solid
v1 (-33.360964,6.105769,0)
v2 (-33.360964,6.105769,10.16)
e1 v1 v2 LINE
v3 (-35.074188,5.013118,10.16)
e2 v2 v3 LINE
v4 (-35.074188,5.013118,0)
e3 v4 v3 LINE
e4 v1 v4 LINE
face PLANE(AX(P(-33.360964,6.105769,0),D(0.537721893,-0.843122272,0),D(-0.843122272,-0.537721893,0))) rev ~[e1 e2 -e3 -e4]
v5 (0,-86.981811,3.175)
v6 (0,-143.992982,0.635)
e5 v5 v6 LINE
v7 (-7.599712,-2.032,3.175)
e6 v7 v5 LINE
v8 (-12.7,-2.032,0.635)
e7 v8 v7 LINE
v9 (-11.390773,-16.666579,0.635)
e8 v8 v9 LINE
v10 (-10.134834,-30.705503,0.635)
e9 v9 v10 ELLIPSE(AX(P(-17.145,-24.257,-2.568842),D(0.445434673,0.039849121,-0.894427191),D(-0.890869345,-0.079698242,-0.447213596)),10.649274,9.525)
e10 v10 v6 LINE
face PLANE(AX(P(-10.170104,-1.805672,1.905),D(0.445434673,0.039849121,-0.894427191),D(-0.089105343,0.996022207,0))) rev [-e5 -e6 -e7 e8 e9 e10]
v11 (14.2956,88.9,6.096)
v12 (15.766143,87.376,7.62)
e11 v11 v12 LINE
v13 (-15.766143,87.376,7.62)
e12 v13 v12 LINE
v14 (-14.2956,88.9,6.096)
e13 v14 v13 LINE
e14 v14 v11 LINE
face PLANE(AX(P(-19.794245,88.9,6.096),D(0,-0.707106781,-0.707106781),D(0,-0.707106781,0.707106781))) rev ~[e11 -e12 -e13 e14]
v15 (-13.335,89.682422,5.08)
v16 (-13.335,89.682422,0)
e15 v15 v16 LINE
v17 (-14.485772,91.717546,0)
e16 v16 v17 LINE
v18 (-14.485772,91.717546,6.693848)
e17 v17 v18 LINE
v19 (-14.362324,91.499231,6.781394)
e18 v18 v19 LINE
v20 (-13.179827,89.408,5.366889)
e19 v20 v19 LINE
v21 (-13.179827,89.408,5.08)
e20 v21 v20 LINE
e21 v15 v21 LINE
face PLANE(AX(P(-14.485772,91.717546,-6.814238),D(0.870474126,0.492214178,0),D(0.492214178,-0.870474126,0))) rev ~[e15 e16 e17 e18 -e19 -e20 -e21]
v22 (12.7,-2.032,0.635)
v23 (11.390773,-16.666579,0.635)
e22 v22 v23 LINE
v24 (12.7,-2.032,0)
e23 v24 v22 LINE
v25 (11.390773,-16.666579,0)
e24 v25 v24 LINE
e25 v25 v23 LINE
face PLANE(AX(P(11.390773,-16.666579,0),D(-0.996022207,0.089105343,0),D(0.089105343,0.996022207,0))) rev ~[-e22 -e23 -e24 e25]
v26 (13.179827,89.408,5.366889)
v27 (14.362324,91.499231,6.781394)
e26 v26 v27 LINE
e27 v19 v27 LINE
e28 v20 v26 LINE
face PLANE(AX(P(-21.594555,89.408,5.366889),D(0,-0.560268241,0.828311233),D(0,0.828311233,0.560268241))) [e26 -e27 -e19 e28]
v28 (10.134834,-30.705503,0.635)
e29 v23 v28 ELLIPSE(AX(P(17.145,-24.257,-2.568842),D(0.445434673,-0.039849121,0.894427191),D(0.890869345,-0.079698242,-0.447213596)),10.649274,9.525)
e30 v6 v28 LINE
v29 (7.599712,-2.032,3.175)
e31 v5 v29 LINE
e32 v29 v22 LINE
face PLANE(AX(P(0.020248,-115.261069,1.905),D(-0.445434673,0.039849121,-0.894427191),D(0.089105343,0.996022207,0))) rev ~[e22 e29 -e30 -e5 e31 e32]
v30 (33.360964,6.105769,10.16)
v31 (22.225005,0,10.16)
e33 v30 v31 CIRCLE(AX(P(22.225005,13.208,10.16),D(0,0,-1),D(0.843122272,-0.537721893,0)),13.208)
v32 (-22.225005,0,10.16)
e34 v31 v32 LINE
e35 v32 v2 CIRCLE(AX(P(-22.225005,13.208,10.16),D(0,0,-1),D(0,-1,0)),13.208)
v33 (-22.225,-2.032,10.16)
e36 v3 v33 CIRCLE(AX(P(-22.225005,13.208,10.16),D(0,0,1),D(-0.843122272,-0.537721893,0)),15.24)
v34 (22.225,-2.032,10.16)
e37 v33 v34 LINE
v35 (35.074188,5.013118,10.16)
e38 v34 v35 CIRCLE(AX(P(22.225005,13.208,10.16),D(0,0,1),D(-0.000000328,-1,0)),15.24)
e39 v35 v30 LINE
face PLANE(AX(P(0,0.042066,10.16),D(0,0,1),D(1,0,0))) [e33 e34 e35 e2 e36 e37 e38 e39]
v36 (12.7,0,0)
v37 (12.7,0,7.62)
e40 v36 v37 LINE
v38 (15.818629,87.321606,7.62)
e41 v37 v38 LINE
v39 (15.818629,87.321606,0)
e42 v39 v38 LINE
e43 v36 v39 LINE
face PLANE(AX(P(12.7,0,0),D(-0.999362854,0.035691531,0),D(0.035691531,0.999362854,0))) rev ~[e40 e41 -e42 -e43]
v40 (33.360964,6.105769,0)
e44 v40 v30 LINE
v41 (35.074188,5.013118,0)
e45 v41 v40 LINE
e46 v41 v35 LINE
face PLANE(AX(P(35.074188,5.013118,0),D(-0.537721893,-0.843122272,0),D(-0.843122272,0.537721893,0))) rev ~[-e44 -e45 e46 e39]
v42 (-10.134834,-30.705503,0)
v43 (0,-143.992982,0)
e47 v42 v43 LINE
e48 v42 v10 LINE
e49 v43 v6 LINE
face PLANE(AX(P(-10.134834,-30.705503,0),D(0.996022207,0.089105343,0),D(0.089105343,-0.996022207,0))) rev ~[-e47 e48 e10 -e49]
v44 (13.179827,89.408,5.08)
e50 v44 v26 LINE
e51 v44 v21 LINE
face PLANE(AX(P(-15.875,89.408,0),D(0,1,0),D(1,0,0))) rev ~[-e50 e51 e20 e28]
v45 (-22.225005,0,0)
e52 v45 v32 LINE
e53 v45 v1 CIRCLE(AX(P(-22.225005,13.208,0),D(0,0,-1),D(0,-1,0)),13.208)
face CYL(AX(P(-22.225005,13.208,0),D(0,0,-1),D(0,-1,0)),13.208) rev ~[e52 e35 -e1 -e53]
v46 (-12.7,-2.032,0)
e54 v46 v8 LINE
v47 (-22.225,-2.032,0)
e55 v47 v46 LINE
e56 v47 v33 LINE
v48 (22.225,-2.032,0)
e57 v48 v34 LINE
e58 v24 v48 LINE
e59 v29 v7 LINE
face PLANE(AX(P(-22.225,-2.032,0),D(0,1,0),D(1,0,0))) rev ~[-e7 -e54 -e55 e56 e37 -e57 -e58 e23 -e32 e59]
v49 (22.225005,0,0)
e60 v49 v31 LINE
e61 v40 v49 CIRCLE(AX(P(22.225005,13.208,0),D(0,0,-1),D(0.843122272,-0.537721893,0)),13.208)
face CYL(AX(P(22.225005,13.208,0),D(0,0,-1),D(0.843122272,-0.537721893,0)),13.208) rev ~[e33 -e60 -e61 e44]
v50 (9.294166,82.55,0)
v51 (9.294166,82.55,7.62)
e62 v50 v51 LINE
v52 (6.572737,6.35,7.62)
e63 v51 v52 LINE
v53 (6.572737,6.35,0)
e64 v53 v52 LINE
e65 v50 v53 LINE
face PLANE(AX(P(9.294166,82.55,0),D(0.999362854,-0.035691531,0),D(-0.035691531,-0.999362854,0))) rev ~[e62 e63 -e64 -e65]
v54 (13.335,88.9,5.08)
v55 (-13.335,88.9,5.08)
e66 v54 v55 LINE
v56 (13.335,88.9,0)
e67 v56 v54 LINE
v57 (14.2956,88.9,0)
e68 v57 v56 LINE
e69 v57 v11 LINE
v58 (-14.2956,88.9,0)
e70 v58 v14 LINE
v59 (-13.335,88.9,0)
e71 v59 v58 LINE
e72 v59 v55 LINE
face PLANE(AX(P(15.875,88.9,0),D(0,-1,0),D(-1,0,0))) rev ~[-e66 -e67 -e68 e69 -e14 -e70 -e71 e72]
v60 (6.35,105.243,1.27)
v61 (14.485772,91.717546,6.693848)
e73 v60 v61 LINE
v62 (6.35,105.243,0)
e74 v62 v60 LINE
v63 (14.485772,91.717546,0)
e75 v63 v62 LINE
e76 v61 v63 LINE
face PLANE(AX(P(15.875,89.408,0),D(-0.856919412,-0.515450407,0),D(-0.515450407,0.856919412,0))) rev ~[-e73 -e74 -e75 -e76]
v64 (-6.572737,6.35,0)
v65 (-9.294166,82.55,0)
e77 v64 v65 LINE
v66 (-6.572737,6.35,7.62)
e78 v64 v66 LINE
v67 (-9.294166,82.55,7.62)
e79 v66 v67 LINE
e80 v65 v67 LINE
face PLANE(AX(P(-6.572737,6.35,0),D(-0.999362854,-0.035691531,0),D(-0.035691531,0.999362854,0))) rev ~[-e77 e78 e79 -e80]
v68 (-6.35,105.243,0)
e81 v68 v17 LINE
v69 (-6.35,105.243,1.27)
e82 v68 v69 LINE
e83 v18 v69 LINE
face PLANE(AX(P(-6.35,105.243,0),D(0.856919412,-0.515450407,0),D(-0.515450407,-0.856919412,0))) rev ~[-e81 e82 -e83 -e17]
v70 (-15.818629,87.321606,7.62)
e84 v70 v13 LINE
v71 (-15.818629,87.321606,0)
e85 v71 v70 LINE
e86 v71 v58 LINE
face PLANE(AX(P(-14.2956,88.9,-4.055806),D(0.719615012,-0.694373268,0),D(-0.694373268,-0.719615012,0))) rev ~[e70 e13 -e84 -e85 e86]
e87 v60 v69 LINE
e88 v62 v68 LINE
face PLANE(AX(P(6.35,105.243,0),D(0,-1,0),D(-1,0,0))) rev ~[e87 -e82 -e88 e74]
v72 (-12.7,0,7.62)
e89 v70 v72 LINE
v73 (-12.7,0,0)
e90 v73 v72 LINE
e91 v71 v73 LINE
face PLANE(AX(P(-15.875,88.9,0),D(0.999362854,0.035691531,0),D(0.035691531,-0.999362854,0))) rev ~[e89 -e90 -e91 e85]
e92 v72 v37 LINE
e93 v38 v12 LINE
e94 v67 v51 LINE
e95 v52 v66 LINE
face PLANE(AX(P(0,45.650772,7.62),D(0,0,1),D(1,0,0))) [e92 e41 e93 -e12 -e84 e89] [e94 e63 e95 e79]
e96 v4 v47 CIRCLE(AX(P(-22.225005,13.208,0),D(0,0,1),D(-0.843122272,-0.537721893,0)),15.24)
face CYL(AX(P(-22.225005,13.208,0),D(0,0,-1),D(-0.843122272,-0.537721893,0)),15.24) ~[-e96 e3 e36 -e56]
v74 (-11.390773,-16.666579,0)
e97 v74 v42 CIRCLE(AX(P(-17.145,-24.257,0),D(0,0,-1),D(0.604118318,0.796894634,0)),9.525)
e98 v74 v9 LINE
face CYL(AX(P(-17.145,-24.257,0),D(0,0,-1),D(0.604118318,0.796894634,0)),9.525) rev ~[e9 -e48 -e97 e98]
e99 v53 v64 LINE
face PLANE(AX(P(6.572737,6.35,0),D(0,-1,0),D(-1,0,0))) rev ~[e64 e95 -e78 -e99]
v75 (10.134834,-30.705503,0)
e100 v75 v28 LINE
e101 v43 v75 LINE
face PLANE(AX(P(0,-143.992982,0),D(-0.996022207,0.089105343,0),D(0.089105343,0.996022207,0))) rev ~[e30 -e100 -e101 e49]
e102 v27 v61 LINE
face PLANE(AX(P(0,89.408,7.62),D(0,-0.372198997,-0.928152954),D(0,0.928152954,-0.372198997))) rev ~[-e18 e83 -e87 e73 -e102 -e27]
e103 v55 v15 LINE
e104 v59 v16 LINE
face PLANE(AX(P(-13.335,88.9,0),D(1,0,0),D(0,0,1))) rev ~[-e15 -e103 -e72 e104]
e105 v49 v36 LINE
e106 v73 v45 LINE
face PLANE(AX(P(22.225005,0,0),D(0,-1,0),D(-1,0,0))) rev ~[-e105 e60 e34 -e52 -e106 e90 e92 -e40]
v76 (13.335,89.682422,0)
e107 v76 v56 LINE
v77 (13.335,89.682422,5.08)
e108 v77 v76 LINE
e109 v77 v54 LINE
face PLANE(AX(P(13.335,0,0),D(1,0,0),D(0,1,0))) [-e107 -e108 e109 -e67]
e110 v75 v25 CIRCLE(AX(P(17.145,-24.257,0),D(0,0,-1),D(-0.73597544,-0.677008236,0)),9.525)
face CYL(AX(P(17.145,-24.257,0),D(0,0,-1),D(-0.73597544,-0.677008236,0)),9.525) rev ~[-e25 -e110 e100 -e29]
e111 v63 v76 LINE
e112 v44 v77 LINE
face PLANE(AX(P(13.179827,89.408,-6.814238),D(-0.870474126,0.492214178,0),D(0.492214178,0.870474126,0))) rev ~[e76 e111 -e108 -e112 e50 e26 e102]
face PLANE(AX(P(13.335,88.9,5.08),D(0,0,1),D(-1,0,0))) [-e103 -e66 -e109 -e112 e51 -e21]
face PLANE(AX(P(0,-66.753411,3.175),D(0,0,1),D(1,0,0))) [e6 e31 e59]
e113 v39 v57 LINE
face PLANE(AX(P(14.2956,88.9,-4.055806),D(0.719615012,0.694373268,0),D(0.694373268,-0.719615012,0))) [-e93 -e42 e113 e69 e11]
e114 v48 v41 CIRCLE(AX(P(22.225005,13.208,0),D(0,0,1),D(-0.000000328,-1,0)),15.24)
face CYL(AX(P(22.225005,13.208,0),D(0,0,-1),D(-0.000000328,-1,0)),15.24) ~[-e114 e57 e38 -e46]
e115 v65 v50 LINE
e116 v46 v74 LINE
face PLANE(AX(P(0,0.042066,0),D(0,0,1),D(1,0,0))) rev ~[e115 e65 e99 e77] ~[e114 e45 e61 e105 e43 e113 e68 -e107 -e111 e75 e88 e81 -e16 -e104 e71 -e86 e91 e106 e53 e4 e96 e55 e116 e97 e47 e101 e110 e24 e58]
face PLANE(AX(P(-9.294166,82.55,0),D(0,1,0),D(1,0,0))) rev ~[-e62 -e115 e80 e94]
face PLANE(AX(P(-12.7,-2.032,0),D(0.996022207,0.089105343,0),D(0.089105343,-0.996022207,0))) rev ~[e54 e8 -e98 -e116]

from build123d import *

# Parameters (mm, degrees)
F1_DEPTH     = 7.62
F2_W         = 26.67
F2_H         = 5.08
F3_DEPTH     = 0.508
F5_DEPTH     = 7.62
F7_DEPTH     = 25.4
F8_T1_DEPTH  = 39.5884897473
F8_T3_DEPTH  = 43.1891092466
F8_T5_DEPTH  = 15.7316119842
F8_T10_DEPTH = 21.2484768612
F8_T15_DEPTH = 21.2484768612
F8_T20_DEPTH = 21.2484768612
F8_T25_DEPTH = 21.2484768612
F10_DEPTH    = 10.16
F12_DEPTH    = 3.175
F13_C1_SIZE2 = 5.08
F13_C1_SIZE  = 2.54
F13_C2_SIZE2 = 2.54
F13_C2_SIZE  = 5.08


# Not quite as in the source:
# - a fillet or chamfer that OpenCascade refuses, or shapes differently, is made with other operations: its cross-section is extruded or revolved along the edge and cut away or added


with BuildPart() as f1:
    # F0 (on Top) → F1 (new body)
    with BuildSketch(Plane.XY):
        Polygon((-15.875, 88.9), (-12.7, 0), (12.7, 0), (15.875, 88.9), align=None)
        Polygon((-6.5727372599, 6.35), (-9.2941658314, 82.55), (9.2941658314, 82.55), (6.5727372599, 6.35), align=None, mode=Mode.SUBTRACT)
    extrude(amount=F1_DEPTH)

    # F2 (on face) → F3 (join)
    with BuildSketch(Plane(origin=(0, 88.9, 0), x_dir=(-1, 0, 0), z_dir=(0, 1, 0))):
        with Locations((0, 2.54)):
            Rectangle(F2_W, F2_H)
    extrude(amount=F3_DEPTH)

    # F4 (on Top) → F5 (join, through all)
    with BuildSketch(Plane.XY):
        Polygon((-6.35, 105.2430003945), (-15.875, 89.408), (15.875, 89.408), (6.35, 105.2430003945), align=None)
    extrude(amount=F5_DEPTH)

    # F6 (on Right) → F7 (cut, symmetric)
    with BuildSketch(Plane.YZ):
        Polygon((105.2430003945, 7.62), (89.408, 7.62), (105.2430003945, 1.27), align=None)
    extrude(amount=F7_DEPTH, both=True, mode=Mode.SUBTRACT)

    # F8: chamfer of 1.524 on 6 edges, made by hand

    # F8_s2 → F8_t1 (cut)
    with BuildSketch(Plane.YZ.offset(-19.7942448737)):
        Polygon((88.9, 6.096), (87.376, 7.62), (88.9, 7.62), align=None)
    extrude(amount=F8_T1_DEPTH, mode=Mode.SUBTRACT)

    # F8_s4 → F8_t3 (cut)
    with BuildSketch(Plane.YZ.offset(-21.5945546233)):
        Polygon((89.408, 5.3668893881), (91.4992312711, 6.7813944907), (89.408, 7.62), align=None)
    extrude(amount=F8_T3_DEPTH, mode=Mode.SUBTRACT)

    # F8_s6 → F8_t5 (cut)
    with BuildSketch(Plane.XY.offset(-4.0558059921)):
        Polygon((14.2955997995, 88.9), (15.8186287896, 87.3216061075), (15.875, 88.9), align=None)
        Polygon((-14.2955997995, 88.9), (-15.8186287896, 87.3216061075), (-15.875, 88.9), align=None)
    extrude(amount=F8_T5_DEPTH, mode=Mode.SUBTRACT)


with BuildPart() as f8_tool8:
    # F8_s9 → F8_t10 (new body)
    with BuildSketch(Plane.XY.offset(-6.8142384306)):
        Polygon((13.1798265815, 89.408), (14.4857717649, 91.7175464201), (15.875, 89.408), align=None)
    extrude(amount=F8_T10_DEPTH)

    split(bisect_by=Plane.YZ.offset(13.335), keep=Keep.TOP)


with BuildPart() as f1_1:
    add(f1.part)

    # F8_t7: cut F8_tool8
    add(f8_tool8.part, mode=Mode.SUBTRACT)


with BuildPart() as f8_tool13:
    # F8_s14 → F8_t15 (new body)
    with BuildSketch(Plane.XY.offset(-6.8142384306)):
        Polygon((13.1798265815, 89.408), (14.4857717649, 91.7175464201), (15.875, 89.408), align=None)
    extrude(amount=F8_T15_DEPTH)

    split(bisect_by=Plane.XY.offset(5.08), keep=Keep.TOP)


with BuildPart() as f1_2:
    add(f1_1.part)

    # F8_t12: cut F8_tool13
    add(f8_tool13.part, mode=Mode.SUBTRACT)


with BuildPart() as f8_tool18:
    # F8_s19 → F8_t20 (new body)
    with BuildSketch(Plane.XY.offset(-6.8142384306)):
        Polygon((-14.4857717649, 91.7175464201), (-13.1798265815, 89.408), (-15.875, 89.408), align=None)
    extrude(amount=F8_T20_DEPTH)

    split(bisect_by=Plane.YZ.offset(-13.335), keep=Keep.BOTTOM)


with BuildPart() as f1_3:
    add(f1_2.part)

    # F8_t17: cut F8_tool18
    add(f8_tool18.part, mode=Mode.SUBTRACT)


with BuildPart() as f8_tool23:
    # F8_s24 → F8_t25 (new body)
    with BuildSketch(Plane.XY.offset(-6.8142384306)):
        Polygon((-14.4857717649, 91.7175464201), (-13.1798265815, 89.408), (-15.875, 89.408), align=None)
    extrude(amount=F8_T25_DEPTH)

    split(bisect_by=Plane.XY.offset(5.08), keep=Keep.TOP)


with BuildPart() as f1_4:
    add(f1_3.part)

    # F8_t22: cut F8_tool23
    add(f8_tool23.part, mode=Mode.SUBTRACT)

    # F9 (on Top) → F10 (join)
    with BuildSketch(Plane.XY):
        with BuildLine():
            Line((22.2250049976, 0), (-22.2250049976, 0))
            ThreePointArc((-22.2250049976, 0), (-28.5750049976, 1.626602675), (-33.360963964, 6.1057692308))
            Line((-33.360963964, 6.1057692308), (-35.0741884204, 5.0131183432))
            ThreePointArc((-35.0741884204, 5.0131183432), (-29.5519258835, -0.155151961), (-22.225, -2.032))
            Line((-22.225, -2.032), (22.225, -2.032))
            ThreePointArc((22.225, -2.032), (29.5519258835, -0.155151961), (35.0741884204, 5.0131183432))
            Line((35.0741884204, 5.0131183432), (33.360963964, 6.1057692308))
            ThreePointArc((33.360963964, 6.1057692308), (28.5750049976, 1.626602675), (22.2250049976, 0))
        make_face()
    extrude(amount=F10_DEPTH)

    # F11 (on Top) → F12 (join)
    with BuildSketch(Plane.XY):
        with BuildLine():
            Line((12.7, -2.032), (-12.7, -2.032))
            Line((-12.7, -2.032), (-11.3907730168, -16.6665786134))
            ThreePointArc((-11.3907730168, -16.6665786134), (-7.6578884737, -23.408271606), (-10.1348339359, -30.7055034507))
            Line((-10.1348339359, -30.7055034507), (0, -143.9929821467))
            Line((0, -143.9929821467), (10.1348339359, -30.7055034507))
            ThreePointArc((10.1348339359, -30.7055034507), (7.6578884737, -23.408271606), (11.3907730168, -16.6665786134))
            Line((11.3907730168, -16.6665786134), (12.7, -2.032))
        make_face()
    extrude(amount=F12_DEPTH)

    # F13: chamfer of 2.54 x 5.08 on 4 edges, made by hand

    # F13_c1
    f13_c1_edges = [f1_4.edges().sort_by_distance(p)[0] for p in [
        (-12.0453865084, -9.3492893067, 3.175),
    ]]
    f13_c1_side = f1_4.faces().sort_by_distance((-12.0453865084, -9.3492893067, 3.1242))[0]
    chamfer(f13_c1_edges, length=F13_C1_SIZE, length2=F13_C1_SIZE2, reference=f13_c1_side)

    # F13_c2
    f13_c2_edges = [f1_4.edges().sort_by_distance(p)[0] for p in [
        (6.3424889397, -73.0964499313, 3.175),
    ]]
    f13_c2_side = f1_4.faces().sort_by_distance((6.2918910116, -73.0919233799, 3.175))[0]
    chamfer(f13_c2_edges, length=F13_C2_SIZE, length2=F13_C2_SIZE2, reference=f13_c2_side)


solid = f1_4.part
